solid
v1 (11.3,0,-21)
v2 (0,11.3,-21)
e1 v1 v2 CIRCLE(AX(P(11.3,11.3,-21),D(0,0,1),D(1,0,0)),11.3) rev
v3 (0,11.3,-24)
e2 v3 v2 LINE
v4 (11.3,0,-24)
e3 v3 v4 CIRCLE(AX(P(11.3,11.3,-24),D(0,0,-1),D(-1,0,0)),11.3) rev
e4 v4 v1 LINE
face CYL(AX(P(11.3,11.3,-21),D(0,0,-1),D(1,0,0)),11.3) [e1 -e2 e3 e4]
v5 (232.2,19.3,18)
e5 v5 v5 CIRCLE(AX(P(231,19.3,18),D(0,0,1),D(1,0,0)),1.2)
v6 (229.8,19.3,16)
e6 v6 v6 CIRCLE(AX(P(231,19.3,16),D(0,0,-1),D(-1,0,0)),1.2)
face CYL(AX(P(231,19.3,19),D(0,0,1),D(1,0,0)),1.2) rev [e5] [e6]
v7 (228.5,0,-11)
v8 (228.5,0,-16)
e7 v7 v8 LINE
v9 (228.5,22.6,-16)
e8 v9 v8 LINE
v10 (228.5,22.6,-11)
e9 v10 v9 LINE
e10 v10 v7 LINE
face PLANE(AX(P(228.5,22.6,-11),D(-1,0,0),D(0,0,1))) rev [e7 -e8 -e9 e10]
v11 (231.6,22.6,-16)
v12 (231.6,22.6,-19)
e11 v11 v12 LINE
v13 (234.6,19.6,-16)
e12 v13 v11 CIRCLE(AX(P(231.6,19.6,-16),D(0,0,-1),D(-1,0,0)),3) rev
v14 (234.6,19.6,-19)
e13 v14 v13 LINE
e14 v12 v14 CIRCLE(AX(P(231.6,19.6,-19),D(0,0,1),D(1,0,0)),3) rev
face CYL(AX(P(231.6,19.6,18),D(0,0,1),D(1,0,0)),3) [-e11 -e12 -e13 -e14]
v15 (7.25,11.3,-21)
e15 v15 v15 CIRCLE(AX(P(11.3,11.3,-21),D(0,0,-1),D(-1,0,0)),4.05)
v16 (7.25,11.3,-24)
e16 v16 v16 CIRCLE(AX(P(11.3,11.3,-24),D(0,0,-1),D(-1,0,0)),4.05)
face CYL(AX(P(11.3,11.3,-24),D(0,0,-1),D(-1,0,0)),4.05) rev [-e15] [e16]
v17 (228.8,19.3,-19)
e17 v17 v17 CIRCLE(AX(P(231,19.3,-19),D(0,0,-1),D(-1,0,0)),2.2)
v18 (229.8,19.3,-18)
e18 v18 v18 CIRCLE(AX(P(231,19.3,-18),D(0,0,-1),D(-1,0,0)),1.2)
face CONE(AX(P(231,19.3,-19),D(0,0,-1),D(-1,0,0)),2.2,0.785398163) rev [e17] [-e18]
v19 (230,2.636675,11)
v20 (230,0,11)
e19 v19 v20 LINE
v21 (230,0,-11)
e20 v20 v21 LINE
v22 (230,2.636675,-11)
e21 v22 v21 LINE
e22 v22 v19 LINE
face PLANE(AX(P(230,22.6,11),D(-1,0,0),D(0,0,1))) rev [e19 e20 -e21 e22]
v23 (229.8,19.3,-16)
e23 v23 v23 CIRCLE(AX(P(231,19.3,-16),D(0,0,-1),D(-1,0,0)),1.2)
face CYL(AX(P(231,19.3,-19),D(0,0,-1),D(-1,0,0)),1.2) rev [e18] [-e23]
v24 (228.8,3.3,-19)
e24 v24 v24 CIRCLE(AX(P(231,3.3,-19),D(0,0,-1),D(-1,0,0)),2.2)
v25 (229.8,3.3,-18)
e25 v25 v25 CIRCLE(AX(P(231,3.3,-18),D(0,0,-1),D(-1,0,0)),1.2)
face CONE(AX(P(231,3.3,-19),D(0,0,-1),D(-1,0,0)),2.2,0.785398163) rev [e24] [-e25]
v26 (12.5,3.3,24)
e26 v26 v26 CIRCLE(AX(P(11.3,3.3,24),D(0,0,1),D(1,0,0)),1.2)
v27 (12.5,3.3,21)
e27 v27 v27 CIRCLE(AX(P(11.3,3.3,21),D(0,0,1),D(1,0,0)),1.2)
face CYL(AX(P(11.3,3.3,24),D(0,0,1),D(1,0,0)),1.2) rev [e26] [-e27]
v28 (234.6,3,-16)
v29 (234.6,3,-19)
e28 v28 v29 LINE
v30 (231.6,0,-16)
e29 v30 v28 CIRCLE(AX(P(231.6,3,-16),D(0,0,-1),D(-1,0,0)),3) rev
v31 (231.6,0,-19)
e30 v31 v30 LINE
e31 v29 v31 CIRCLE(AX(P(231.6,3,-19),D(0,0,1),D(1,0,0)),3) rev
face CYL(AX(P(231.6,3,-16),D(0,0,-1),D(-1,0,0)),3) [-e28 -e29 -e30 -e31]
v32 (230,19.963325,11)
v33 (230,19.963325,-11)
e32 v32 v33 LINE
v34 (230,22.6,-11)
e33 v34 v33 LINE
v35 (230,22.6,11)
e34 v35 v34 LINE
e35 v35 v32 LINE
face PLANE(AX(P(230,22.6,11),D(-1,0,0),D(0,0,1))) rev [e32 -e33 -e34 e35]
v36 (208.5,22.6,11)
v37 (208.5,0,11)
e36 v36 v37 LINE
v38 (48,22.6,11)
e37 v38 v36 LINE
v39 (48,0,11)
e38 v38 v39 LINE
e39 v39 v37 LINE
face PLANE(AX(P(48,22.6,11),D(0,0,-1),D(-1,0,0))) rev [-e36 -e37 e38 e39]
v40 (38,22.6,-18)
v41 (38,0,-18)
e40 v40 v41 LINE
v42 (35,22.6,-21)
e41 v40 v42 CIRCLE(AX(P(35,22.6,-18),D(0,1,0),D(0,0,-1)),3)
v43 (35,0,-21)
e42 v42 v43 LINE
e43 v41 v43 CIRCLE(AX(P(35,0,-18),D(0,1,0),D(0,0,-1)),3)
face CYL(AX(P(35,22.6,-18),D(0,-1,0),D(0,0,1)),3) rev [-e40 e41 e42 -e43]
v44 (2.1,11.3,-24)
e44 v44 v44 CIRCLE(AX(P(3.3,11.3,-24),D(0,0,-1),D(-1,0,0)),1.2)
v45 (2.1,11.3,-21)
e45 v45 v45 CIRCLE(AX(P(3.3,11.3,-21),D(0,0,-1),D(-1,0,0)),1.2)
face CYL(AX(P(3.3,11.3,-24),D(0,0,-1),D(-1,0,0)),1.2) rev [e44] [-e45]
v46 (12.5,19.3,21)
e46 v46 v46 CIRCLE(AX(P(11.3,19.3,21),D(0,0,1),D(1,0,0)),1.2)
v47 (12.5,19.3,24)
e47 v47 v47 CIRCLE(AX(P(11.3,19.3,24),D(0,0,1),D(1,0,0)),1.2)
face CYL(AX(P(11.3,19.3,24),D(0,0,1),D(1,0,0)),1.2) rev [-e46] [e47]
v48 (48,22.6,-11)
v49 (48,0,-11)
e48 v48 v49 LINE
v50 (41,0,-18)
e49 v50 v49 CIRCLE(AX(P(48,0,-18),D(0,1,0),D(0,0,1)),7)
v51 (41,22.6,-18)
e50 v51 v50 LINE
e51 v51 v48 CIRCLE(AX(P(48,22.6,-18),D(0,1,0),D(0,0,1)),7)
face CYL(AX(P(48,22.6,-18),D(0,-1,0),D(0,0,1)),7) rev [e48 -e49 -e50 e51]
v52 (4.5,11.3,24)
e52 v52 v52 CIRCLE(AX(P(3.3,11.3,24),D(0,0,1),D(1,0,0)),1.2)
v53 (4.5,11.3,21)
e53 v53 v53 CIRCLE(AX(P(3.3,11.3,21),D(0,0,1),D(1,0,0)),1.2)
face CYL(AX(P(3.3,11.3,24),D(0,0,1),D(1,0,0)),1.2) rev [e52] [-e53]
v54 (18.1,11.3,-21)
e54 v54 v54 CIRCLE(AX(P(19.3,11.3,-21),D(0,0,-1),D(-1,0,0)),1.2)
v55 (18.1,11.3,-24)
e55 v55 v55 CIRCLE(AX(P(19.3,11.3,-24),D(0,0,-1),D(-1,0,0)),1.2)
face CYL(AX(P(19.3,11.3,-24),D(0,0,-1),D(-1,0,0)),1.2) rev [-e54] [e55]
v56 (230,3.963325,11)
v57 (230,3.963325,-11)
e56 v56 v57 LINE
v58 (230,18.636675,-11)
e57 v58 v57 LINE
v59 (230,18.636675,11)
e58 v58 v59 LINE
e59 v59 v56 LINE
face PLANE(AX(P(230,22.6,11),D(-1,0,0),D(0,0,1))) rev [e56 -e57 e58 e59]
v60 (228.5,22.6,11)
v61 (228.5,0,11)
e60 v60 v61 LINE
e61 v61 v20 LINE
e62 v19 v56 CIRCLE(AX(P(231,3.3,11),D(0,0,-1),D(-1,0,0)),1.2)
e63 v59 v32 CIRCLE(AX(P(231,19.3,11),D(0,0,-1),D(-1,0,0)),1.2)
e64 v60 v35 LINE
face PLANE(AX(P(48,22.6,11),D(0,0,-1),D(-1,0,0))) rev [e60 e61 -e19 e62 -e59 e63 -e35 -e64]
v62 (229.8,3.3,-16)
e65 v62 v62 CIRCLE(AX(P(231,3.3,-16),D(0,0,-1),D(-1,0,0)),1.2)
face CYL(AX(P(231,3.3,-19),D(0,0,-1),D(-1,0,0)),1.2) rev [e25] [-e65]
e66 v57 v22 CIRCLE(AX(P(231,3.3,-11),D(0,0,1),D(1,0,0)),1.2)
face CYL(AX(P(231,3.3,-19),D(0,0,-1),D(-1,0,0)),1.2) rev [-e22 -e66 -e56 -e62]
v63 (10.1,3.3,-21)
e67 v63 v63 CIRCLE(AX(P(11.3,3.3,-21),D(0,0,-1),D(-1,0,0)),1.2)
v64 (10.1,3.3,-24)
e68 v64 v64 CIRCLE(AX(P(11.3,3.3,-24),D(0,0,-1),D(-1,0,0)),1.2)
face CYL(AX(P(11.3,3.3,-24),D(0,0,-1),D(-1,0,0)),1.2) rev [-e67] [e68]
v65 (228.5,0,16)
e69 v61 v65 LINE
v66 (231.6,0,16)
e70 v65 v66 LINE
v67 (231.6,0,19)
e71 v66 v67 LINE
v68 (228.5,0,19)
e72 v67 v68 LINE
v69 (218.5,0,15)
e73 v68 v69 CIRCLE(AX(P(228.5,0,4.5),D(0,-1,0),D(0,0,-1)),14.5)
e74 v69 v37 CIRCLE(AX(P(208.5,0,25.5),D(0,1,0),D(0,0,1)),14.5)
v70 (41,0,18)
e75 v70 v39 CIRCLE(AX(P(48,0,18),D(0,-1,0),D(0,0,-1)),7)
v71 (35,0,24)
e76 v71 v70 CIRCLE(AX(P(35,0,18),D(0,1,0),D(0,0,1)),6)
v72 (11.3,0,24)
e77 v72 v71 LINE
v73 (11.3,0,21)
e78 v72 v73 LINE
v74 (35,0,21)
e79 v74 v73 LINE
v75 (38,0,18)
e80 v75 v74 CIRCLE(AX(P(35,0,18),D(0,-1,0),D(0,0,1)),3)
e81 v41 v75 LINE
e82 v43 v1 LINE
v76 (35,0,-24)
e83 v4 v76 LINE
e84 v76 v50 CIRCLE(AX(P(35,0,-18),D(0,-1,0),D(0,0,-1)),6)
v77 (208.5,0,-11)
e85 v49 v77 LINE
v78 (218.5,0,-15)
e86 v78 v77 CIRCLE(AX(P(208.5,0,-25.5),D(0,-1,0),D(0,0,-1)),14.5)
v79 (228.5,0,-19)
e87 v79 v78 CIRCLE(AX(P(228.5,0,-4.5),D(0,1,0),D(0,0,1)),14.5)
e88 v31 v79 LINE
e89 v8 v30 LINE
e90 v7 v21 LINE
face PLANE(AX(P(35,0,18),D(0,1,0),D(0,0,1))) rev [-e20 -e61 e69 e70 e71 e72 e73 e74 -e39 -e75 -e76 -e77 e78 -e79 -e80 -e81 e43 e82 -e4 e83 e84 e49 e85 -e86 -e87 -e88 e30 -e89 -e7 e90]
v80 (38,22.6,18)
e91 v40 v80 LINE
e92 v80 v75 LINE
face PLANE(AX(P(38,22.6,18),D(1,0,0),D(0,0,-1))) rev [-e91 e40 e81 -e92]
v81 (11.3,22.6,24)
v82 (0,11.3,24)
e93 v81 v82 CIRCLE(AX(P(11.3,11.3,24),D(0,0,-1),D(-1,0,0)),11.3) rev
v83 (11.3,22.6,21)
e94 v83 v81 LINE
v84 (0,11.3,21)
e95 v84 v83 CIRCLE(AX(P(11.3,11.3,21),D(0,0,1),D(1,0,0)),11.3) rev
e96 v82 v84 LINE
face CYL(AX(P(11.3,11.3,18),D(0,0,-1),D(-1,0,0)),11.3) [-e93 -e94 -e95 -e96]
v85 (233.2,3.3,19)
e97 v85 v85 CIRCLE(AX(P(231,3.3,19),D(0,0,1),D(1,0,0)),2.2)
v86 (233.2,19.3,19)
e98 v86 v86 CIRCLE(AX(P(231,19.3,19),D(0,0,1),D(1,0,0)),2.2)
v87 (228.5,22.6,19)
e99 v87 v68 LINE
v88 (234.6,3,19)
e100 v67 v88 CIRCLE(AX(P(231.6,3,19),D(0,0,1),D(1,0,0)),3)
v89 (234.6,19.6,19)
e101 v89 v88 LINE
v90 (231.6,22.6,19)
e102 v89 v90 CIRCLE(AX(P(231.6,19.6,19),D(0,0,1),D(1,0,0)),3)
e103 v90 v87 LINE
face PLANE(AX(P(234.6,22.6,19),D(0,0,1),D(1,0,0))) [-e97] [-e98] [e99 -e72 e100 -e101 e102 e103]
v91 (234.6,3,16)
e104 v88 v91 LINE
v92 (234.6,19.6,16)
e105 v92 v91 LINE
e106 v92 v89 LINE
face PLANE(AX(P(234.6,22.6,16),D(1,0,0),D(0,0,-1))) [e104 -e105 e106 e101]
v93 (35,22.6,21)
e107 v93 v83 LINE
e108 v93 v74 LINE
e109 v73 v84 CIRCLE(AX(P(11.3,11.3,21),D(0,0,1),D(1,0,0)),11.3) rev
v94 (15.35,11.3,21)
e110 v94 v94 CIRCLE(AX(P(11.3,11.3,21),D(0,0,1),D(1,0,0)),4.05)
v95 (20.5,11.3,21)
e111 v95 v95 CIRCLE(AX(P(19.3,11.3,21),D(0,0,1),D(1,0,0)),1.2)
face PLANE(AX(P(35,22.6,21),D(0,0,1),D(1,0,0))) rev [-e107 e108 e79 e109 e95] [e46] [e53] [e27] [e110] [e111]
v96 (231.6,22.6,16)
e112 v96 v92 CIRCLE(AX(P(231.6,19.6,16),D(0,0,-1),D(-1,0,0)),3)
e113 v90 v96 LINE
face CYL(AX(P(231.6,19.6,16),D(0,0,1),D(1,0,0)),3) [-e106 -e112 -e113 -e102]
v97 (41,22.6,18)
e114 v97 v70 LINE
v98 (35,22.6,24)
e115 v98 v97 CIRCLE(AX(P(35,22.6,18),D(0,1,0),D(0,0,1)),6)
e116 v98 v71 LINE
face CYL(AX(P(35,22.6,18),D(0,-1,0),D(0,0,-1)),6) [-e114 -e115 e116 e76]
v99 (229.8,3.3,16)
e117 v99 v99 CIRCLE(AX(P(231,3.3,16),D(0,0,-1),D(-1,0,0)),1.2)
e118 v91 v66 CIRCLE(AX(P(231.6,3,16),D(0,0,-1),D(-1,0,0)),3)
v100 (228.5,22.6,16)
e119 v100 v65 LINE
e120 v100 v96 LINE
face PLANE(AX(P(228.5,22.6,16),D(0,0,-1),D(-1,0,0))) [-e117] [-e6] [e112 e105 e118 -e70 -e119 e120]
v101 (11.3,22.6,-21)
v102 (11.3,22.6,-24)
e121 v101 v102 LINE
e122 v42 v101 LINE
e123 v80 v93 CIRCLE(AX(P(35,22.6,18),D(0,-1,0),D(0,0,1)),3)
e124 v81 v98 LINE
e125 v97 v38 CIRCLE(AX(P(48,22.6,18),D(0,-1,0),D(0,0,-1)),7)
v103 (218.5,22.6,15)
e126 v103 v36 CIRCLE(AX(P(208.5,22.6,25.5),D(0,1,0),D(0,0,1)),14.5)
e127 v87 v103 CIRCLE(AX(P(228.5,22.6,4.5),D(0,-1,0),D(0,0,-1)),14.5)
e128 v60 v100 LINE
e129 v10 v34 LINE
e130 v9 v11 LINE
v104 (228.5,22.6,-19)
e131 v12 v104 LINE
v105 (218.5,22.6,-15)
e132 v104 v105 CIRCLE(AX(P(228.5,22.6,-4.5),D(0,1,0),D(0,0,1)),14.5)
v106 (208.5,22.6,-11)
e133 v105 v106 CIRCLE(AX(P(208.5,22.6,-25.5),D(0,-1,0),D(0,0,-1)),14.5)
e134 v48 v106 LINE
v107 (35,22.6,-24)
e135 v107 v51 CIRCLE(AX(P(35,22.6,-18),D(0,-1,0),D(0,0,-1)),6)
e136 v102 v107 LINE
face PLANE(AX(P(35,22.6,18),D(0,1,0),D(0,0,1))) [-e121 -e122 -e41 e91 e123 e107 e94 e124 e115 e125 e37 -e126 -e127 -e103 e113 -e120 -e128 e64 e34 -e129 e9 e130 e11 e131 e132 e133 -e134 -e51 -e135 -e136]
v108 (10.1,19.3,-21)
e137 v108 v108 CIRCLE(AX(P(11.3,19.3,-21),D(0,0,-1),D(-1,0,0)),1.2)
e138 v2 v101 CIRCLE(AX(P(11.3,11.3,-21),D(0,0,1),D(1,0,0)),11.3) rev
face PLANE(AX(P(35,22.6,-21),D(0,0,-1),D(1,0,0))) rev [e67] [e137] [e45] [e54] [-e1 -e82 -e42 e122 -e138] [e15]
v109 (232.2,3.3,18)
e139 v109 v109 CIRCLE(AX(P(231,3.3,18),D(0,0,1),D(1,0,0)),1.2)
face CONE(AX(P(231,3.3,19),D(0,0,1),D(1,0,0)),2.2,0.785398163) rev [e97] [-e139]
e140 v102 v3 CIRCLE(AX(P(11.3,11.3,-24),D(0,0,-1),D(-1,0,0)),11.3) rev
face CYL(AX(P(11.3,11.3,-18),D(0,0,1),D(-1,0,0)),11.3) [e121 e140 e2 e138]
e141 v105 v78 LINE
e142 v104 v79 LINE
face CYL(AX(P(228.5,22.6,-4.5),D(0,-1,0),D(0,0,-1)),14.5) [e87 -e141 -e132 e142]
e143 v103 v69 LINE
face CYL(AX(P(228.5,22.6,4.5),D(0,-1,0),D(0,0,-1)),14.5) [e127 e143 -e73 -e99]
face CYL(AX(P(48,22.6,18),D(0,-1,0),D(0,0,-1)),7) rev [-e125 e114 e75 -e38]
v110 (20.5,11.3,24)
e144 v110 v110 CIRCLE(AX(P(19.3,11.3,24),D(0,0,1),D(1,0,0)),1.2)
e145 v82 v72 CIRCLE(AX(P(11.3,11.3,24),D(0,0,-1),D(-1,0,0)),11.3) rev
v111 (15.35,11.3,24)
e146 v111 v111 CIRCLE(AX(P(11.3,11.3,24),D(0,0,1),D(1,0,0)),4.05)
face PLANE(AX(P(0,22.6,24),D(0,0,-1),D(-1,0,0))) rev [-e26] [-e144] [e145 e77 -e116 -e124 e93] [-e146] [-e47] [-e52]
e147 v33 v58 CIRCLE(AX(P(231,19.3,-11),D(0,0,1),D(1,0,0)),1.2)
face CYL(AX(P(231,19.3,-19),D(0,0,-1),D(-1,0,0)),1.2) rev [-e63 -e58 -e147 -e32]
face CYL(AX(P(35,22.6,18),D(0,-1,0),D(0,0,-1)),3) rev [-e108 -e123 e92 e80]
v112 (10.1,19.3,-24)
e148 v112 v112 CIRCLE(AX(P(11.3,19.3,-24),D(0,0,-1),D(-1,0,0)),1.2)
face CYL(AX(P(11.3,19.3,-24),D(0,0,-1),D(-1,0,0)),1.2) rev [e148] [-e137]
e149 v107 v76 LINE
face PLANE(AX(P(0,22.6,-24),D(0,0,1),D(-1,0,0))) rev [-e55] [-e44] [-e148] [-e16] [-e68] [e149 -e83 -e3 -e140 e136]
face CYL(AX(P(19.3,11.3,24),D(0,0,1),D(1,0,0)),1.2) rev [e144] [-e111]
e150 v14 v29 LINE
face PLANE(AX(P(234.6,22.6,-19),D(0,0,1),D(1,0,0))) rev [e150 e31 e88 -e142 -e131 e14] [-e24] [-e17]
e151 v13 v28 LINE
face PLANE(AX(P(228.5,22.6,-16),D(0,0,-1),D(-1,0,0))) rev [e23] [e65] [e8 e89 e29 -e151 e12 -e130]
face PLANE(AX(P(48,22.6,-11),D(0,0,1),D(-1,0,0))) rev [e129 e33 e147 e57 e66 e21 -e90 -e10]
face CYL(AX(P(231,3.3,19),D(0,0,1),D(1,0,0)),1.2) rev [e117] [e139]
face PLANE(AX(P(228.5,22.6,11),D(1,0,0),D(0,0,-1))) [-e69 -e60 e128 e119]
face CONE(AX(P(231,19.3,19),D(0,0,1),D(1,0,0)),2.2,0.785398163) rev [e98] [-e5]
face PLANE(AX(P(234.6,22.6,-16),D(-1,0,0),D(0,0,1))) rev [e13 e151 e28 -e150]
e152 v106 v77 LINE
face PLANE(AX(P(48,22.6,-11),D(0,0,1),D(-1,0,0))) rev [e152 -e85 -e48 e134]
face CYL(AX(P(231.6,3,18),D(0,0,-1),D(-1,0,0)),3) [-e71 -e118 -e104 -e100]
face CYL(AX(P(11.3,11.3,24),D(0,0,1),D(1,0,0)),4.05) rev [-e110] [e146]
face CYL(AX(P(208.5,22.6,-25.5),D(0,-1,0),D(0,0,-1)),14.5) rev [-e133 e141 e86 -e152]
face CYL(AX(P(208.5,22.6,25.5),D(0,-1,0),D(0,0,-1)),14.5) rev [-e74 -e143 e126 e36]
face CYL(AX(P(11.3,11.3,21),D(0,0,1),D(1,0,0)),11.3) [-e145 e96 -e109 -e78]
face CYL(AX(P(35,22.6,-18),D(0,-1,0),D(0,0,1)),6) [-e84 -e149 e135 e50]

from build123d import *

# Parameters (mm, degrees)
BOSS_EXTRUDE3_DEPTH                                 = 22.6
FILLET2_R                                           = 11.3
BOSS_EXTRUDE4_DEPTH                                 = 22.6
CSK_FOR_M2_COUNTERSUNK_FLAT_HEAD_SCREW1_D           = 2.4
CSK_FOR_M2_COUNTERSUNK_FLAT_HEAD_SCREW1_CSINK_D     = 4.4
CSK_FOR_M2_COUNTERSUNK_FLAT_HEAD_SCREW1_CSINK_ANGLE = 90
FILLET3_R                                           = 3
FILLET3_OF_MIRROR4_R                                = 3
M2_CLEARANCE_HOLE1_D                                = 2.4
M2_CLEARANCE_HOLE1_DEPTH                            = 3
CIRPATTERN1_COUNT                                   = 4
F_8_1_8_1_DIAMETER_HOLE1_D                          = 8.1
F_8_1_8_1_DIAMETER_HOLE1_DEPTH                      = 3
F_8_1_8_1_DIAMETER_HOLE2_D                          = 8.1
M2_CLEARANCE_HOLE2_D                                = 2.4
CIRPATTERN2_COUNT                                   = 4


with BuildPart() as part:
    # Sketch4 → Boss-Extrude3 (new body)
    with BuildSketch(Plane(origin=(0, 0, 0), x_dir=(1, 0, 0), z_dir=(0, 1, 0))):
        with BuildLine():
            Line((0, -21), (0, -24))
            Line((0, -24), (35, -24))
            ThreePointArc((35, -24), (39.242640687, -22.242640687), (41, -18))
            ThreePointArc((41, -18), (43.050252532, -13.050252532), (48, -11))
            Line((48, -11), (230, -11))
            Line((230, -11), (230, 0))
            Line((230, 0), (38, 0))
            Line((38, 0), (38, -18))
            ThreePointArc((38, -18), (37.121320344, -20.121320344), (35, -21))
            Line((35, -21), (0, -21))
        make_face()
    extrude(amount=BOSS_EXTRUDE3_DEPTH)

    # Fillet2
    fillet2_edges = [part.edges().sort_by_distance(p)[0] for p in [
        (0, 0, 22.5),
        (0, 22.6, 22.5),
    ]]
    fillet(fillet2_edges, radius=FILLET2_R - 0.0001)  # a hair under: the kernel refuses the full size

    # Mirror3: part across plane


with BuildPart() as part_1:
    add(part.part)
    add(part.part.mirror(Plane.XY))

    # Sketch5 → Boss-Extrude4 (add, through all)
    with BuildSketch(Plane(origin=(0, 0, 0), x_dir=(1, 0, 0), z_dir=(0, 1, 0))):
        with BuildLine():
            Line((208.5, 11), (228.5, 11))
            Line((228.5, 11), (228.5, 16))
            Line((228.5, 16), (234.6, 16))
            Line((234.6, 16), (234.6, 19))
            Line((234.6, 19), (228.5, 19))
            ThreePointArc((228.5, 19), (223.114835193, 17.962912018), (218.5, 15))
            ThreePointArc((218.5, 15), (213.885164807, 12.037087982), (208.5, 11))
        make_face()
    boss_extrude4 = extrude(amount=BOSS_EXTRUDE4_DEPTH)

    # CSK for M2 Countersunk Flat Head Screw1 (through all)
    with Locations(Plane(origin=(231, 3.3, -19), x_dir=(-1, 0, 0), z_dir=(0, 0, -1))):
        with Locations((0, 0), (0, 16)):
            csk_for_m2_countersunk_flat_head_screw1 = CounterSinkHole(CSK_FOR_M2_COUNTERSUNK_FLAT_HEAD_SCREW1_D / 2, CSK_FOR_M2_COUNTERSUNK_FLAT_HEAD_SCREW1_CSINK_D / 2, counter_sink_angle=CSK_FOR_M2_COUNTERSUNK_FLAT_HEAD_SCREW1_CSINK_ANGLE)

    # Fillet3
    fillet3_edges = [part_1.edges().sort_by_distance(p)[0] for p in [
        (234.6, 0, -17.5),
        (234.6, 22.6, -17.5),
    ]]
    fillet(fillet3_edges, radius=FILLET3_R)

    # Mirror4: Boss-Extrude4, CSK for M2 Countersunk Flat Head Screw1 across plane
    add(boss_extrude4.mirror(Plane.XY))
    add(csk_for_m2_countersunk_flat_head_screw1.mirror(Plane.XY), mode=Mode.SUBTRACT)

    # Fillet3 of Mirror4
    fillet3_of_mirror4_edges = [part_1.edges().sort_by_distance(p)[0] for p in [
        (234.6, 0, 17.5),
        (234.6, 22.6, 17.5),
    ]]
    fillet(fillet3_of_mirror4_edges, radius=FILLET3_OF_MIRROR4_R)

    # M2 Clearance Hole1
    with Locations(Plane(origin=(3.3, 11.3, 24), x_dir=(1, 0, 0), z_dir=(0, 0, 1))):
        with Locations((0, 0)):
            m2_clearance_hole1 = Hole(M2_CLEARANCE_HOLE1_D / 2, depth=M2_CLEARANCE_HOLE1_DEPTH)

    # CirPattern1: M2 Clearance Hole1 ×4 about axis
    cirpattern1_axis = Axis((11.3, 11.3, 0), (0, 0, 1))
    for i in range(1, CIRPATTERN1_COUNT):
        add(m2_clearance_hole1.rotate(cirpattern1_axis, i * 360 / CIRPATTERN1_COUNT), mode=Mode.SUBTRACT)

    # Ø8.1 (8.1) Diameter Hole1
    with Locations(Plane(origin=(11.3, 11.3, -24), x_dir=(-1, 0, 0), z_dir=(0, 0, -1))):
        with Locations((0, 0)):
            Hole(F_8_1_8_1_DIAMETER_HOLE1_D / 2, depth=F_8_1_8_1_DIAMETER_HOLE1_DEPTH)

    # Ø8.1 (8.1) Diameter Hole2 (through all)
    with Locations(Plane(origin=(11.3, 11.3, 24), x_dir=(1, 0, 0), z_dir=(0, 0, 1))):
        with Locations((0, 0)):
            Hole(F_8_1_8_1_DIAMETER_HOLE2_D / 2)

    # M2 Clearance Hole2 (through all)
    with Locations(Plane(origin=(3.3, 11.3, -24), x_dir=(-1, 0, 0), z_dir=(0, 0, -1))):
        with Locations((0, 0)):
            m2_clearance_hole2 = Hole(M2_CLEARANCE_HOLE2_D / 2)

    # CirPattern2: M2 Clearance Hole2 ×4 about axis
    cirpattern2_axis = Axis((11.3, 11.3, 0), (0, 0, 1))
    for i in range(1, CIRPATTERN2_COUNT):
        add(m2_clearance_hole2.rotate(cirpattern2_axis, i * 360 / CIRPATTERN2_COUNT), mode=Mode.SUBTRACT)


solid = part_1.part
